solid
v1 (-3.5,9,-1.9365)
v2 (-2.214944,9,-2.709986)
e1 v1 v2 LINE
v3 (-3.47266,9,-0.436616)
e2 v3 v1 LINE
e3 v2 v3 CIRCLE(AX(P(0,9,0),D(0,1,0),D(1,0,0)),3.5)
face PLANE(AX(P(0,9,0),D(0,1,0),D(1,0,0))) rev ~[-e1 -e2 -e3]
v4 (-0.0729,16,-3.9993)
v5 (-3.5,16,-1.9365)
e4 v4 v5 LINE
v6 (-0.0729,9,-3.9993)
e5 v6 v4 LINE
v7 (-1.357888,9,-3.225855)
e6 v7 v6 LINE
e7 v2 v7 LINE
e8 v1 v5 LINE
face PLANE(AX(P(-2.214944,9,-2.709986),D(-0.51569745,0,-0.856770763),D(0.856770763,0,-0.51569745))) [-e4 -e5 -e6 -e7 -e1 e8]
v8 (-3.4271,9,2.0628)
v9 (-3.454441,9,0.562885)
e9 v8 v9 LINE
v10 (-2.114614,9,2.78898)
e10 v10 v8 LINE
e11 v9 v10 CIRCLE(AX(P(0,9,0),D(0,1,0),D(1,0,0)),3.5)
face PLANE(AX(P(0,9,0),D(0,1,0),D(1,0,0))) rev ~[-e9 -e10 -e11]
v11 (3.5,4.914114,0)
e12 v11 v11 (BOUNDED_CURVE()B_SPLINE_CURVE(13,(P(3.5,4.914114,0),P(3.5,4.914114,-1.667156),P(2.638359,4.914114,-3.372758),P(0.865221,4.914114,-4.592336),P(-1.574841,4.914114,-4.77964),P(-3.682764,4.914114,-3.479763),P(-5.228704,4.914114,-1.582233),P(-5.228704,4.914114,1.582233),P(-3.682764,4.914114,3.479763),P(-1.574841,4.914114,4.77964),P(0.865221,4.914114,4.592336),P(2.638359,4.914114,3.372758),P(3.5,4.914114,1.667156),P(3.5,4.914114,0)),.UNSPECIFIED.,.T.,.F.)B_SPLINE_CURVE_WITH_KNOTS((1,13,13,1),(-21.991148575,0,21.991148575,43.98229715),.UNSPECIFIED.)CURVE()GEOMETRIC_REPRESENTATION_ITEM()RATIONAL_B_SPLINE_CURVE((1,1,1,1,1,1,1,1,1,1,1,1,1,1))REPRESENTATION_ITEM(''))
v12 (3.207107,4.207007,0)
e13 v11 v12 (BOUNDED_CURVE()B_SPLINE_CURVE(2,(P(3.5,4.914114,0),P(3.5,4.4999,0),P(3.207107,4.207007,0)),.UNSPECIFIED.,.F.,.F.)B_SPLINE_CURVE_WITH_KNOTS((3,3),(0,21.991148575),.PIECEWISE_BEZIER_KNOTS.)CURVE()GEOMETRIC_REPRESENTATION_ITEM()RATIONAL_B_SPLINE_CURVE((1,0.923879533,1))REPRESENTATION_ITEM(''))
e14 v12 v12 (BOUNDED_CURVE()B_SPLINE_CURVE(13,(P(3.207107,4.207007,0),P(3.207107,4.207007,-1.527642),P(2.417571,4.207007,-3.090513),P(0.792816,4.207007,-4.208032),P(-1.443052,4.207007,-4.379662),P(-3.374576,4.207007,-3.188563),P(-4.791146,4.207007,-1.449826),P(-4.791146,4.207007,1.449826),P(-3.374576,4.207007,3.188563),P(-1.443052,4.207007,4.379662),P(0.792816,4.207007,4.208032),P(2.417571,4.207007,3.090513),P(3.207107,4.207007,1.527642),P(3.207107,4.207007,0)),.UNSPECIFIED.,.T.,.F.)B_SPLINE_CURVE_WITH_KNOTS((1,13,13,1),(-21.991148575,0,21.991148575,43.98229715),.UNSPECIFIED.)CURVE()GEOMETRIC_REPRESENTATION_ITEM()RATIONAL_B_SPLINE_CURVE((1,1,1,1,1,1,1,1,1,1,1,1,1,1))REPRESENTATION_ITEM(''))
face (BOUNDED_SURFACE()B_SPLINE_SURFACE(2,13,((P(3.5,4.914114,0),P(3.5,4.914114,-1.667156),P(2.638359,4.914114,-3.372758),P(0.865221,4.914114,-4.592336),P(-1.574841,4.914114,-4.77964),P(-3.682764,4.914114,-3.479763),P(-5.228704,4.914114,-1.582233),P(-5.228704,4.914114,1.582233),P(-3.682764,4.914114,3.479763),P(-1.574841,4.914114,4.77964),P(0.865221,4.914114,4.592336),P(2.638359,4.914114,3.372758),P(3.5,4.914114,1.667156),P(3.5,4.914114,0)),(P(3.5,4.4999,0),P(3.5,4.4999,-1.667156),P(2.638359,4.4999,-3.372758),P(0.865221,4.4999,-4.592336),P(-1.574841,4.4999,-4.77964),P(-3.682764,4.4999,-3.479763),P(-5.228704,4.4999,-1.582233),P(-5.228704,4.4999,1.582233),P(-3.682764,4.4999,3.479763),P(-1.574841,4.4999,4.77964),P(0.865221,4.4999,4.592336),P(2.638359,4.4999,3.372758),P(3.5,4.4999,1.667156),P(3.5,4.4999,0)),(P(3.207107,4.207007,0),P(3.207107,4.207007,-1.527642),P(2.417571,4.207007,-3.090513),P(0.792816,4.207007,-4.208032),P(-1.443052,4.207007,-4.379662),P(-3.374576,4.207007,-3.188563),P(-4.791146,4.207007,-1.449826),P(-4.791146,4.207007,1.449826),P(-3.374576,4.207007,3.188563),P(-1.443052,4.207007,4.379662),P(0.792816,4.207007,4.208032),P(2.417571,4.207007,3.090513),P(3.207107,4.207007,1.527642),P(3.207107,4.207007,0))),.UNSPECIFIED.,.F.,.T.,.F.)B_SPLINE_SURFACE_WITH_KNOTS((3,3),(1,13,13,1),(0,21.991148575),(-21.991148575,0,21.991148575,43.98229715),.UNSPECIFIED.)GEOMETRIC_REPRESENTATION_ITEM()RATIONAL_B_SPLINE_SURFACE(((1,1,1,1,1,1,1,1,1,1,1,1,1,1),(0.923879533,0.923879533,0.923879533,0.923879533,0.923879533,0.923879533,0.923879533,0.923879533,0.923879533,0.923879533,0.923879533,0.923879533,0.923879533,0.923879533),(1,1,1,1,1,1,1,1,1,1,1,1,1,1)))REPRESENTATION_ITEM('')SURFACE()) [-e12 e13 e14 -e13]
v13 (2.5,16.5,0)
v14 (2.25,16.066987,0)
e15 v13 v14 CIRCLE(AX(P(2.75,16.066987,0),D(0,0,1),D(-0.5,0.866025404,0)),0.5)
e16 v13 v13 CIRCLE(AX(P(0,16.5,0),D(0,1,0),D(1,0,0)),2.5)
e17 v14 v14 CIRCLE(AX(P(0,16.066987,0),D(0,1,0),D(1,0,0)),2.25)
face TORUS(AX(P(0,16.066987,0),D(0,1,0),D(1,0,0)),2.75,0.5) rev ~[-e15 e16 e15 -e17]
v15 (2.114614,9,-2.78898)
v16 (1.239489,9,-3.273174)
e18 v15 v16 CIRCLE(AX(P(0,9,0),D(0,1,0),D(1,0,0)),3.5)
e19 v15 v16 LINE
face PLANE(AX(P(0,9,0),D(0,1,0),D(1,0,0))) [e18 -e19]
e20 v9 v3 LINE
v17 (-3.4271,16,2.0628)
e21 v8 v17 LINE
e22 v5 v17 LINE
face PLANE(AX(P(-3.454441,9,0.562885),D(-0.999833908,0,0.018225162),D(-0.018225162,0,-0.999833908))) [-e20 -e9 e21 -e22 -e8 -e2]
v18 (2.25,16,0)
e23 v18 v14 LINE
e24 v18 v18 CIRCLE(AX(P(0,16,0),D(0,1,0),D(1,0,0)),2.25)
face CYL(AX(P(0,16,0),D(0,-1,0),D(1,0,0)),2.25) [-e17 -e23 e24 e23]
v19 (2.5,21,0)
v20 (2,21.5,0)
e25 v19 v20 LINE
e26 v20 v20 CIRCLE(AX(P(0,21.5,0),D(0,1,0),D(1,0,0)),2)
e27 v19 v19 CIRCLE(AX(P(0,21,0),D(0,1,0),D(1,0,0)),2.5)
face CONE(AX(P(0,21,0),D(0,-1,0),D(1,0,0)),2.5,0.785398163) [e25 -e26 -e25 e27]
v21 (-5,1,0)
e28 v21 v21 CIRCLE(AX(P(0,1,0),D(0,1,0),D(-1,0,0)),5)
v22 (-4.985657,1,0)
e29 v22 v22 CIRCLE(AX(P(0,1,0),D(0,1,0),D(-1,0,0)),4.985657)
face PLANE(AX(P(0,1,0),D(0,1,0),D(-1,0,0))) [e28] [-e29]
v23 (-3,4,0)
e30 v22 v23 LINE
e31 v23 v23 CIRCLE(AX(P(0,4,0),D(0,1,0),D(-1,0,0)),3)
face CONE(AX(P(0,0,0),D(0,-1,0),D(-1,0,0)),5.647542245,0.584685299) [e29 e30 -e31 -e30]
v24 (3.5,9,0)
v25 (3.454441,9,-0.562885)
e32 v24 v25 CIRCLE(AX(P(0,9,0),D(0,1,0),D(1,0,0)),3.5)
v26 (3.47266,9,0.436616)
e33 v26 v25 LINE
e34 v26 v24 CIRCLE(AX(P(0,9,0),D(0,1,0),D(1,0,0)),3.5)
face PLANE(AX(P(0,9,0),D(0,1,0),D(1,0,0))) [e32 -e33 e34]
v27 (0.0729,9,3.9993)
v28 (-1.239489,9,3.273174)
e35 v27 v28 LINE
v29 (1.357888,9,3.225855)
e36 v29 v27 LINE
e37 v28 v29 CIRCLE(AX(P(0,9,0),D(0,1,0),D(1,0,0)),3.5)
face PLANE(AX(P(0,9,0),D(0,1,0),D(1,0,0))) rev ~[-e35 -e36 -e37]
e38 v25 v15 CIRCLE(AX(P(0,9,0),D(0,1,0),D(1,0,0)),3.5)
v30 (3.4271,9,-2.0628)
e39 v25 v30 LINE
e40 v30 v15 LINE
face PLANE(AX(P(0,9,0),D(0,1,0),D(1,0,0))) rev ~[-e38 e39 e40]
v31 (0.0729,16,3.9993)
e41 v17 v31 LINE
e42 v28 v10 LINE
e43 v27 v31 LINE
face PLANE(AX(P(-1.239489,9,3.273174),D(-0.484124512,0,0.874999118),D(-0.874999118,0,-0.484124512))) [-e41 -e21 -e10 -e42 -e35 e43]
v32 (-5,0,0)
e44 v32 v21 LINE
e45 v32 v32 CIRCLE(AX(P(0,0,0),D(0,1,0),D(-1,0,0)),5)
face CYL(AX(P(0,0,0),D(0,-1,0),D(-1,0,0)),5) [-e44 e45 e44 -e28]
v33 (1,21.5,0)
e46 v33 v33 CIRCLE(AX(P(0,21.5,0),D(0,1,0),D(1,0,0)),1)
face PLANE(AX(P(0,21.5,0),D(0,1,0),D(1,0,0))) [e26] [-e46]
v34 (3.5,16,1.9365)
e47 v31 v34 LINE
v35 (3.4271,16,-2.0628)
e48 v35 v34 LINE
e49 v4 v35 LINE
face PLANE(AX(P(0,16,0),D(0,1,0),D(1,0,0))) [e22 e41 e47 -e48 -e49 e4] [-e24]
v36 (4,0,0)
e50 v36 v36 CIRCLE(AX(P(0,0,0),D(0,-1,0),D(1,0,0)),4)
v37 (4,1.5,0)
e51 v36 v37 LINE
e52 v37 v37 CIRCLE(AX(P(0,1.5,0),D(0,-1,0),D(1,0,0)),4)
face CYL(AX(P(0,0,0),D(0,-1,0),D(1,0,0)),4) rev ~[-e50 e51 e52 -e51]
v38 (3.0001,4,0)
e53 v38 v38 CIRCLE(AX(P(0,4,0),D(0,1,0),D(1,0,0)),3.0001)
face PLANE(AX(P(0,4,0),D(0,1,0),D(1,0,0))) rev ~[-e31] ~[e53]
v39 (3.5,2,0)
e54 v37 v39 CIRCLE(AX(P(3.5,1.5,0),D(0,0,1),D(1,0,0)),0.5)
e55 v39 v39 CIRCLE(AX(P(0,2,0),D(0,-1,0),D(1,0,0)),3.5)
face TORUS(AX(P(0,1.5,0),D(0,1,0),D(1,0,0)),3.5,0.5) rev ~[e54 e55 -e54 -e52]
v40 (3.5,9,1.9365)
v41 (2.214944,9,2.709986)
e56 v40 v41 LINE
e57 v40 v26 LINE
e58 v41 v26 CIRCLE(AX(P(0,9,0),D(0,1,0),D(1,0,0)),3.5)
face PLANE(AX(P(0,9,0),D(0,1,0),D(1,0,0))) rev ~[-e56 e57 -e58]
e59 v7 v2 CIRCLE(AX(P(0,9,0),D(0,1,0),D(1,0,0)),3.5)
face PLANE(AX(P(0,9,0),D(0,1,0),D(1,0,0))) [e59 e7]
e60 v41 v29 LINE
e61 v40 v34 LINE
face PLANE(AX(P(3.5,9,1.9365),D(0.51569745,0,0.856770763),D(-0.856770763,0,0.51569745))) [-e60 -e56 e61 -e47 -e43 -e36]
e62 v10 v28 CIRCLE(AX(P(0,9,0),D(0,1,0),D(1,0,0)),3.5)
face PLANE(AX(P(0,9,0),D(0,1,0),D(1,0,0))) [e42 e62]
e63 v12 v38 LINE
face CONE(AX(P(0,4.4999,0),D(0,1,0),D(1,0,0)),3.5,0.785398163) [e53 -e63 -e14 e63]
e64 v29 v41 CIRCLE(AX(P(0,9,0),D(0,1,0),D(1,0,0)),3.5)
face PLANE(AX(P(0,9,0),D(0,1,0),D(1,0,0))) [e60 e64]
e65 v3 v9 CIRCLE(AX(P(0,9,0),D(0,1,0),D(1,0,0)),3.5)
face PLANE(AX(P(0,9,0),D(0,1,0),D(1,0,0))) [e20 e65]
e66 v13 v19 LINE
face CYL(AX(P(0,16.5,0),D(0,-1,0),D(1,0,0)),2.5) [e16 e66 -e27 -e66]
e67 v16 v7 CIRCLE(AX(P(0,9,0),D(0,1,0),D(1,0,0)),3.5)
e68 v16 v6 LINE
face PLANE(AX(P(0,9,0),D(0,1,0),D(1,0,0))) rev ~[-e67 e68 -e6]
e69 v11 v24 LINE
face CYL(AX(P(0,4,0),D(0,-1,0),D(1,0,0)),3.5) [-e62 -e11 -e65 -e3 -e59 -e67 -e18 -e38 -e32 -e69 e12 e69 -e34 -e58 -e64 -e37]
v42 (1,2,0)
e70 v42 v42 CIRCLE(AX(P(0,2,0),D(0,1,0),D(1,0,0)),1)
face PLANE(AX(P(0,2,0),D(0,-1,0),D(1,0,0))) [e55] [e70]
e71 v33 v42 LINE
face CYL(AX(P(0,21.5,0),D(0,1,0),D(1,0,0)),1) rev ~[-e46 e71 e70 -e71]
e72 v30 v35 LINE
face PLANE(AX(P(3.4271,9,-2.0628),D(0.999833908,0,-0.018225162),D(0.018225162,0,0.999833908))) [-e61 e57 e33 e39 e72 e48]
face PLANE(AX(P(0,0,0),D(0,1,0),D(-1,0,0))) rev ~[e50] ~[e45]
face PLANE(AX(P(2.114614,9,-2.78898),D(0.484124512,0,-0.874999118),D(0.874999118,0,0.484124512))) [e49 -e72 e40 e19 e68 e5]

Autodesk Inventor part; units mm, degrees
ref_plane "YZ Plane" through (0, 0, 0) normal (1, 0, 0) x (0, 1, 0)
ref_plane "XZ Plane" through (0, 0, 0) normal (0, 1, 0) x (-1, 0, 0)
ref_plane "XY Plane" through (0, 0, 0) normal (0, 0, 1) x (1, 0, 0)
sketch "Sketch1" plane through (0, 0, 0) normal (0, 1, 0) x (-1, 0, 0)
  circle A0 centre (0, 0) radius 5
  circle A1 centre (0, 0) radius 3
  dimension "d35" = 10
  dimension "d36" = 6
extrude "Extrusion11" add sketch "Sketch1" along normal blind 4 contours A1
extrude "Extrusion12" add sketch "Sketch1" along normal blind 1
draft "FaceDraft2" angle 33.5 pull direction (0, 1, 0) faces at (-2.9903, 3, -0.2414) fixed edges at (3, 4, 0)
sketch "Sketch8" plane through (0, 4, 0) normal (0, 1, 0) x (1, 0, 0)
  circle A0 centre (0, 0) radius 3.5
  dimension "d42" = 7
extrude "Extrusion13" add sketch "Sketch8" along normal blind 5
chamfer "Chamfer2" distance 0.5 angle 45 1 edges at (-3.5, 4, 0)
fillet "Fillet1" radius 1 1 edges at (-3.5, 4.4999, 0)
sketch "Sketch9" plane through (0, 9, 0) normal (0, 1, 0) x (1, 0, 0)
  circle A0 centre (0, 0) radius 4
  line L0 (3.5, -1.9365) -> (0.0729, -3.9993)
  line L1 (0.0729, -3.9993) -> (-3.4271, -2.0628)
  line L2 (-3.4271, -2.0628) -> (-3.5, 1.9365)
  line L3 (-3.5, 1.9365) -> (-0.0729, 3.9993)
  line L4 (-0.0729, 3.9993) -> (3.4271, 2.0628)
  line L5 (3.4271, 2.0628) -> (3.5, -1.9365)
  circle A1 centre (0, 0) radius 3.5
  point P0 (1.3581, -3.2258)
  point P1 (-1.2396, -3.2732)
  point P2 (-2.1146, -2.789)
  point P3 (-3.4544, -0.5631)
  point P4 (-3.4726, 0.4367)
  point P5 (-2.2149, 2.7101)
  point P6 (-1.3581, 3.2258)
  point P7 (1.2396, 3.2732)
  point P8 (2.1146, 2.789)
  point P9 (3.4544, 0.5631)
  point P10 (3.4726, -0.4367)
  point P11 (2.2149, -2.7101)
  dimension "d49" = 8
extrude "Extrusion14" add sketch "Sketch9" along normal blind 7 contours L5 A1 L4 | L0 A1 L5 | L4 A1 L3 | A1 L5 L0 L1 L2 L3 L4 | L1 A1 L0 | L3 A1 L2 | L2 A1 L1
sketch "Sketch10" plane through (0, 16, 0) normal (0, 1, 0) x (1, 0, 0)
  circle A0 centre (0, 0) radius 2.5
  circle A1 centre (0, 0) radius 2.25
  dimension "d54" = 5
  dimension "d55" = 4.5
extrude "Extrusion16" add sketch "Sketch10" along normal blind 0.5 contours A1
sketch "Sketch11" plane through (0, 16.5, 0) normal (0, 1, 0) x (1, 0, 0)
  circle A0 centre (0, 0) radius 2.5
  dimension "d58" = 5
extrude "Extrusion18" add sketch "Sketch11" along normal blind 5
fillet "Fillet2" radius 0.5 1 edges at (-2.25, 16.5, 0)
thread "Thread2" size "M5x0.8" class "6g" standard "ANSI Metric M Profile" full length
chamfer "Chamfer3" distance 0.5 angle 45 1 edges at (-2.5, 21.5, 0)
sketch "Sketch12" plane through (0, 0, 0) normal (0, -1, 0) x (1, 0, 0)
  circle A0 centre (0, 0) radius 4
  dimension "d70" = 8
extrude "Extrusion19" cut sketch "Sketch12" against normal blind 2
fillet "Fillet3" radius 0.5 1 edges at (-4, 2, 0)
sketch "Sketch13" plane through (0, 21.5, 0) normal (0, 1, 0) x (1, 0, 0)
  circle A0 centre (0, 0) radius 1
  dimension "d74" = 2
extrude "Extrusion20" cut sketch "Sketch13" against normal up to next
properties part number "cup"
